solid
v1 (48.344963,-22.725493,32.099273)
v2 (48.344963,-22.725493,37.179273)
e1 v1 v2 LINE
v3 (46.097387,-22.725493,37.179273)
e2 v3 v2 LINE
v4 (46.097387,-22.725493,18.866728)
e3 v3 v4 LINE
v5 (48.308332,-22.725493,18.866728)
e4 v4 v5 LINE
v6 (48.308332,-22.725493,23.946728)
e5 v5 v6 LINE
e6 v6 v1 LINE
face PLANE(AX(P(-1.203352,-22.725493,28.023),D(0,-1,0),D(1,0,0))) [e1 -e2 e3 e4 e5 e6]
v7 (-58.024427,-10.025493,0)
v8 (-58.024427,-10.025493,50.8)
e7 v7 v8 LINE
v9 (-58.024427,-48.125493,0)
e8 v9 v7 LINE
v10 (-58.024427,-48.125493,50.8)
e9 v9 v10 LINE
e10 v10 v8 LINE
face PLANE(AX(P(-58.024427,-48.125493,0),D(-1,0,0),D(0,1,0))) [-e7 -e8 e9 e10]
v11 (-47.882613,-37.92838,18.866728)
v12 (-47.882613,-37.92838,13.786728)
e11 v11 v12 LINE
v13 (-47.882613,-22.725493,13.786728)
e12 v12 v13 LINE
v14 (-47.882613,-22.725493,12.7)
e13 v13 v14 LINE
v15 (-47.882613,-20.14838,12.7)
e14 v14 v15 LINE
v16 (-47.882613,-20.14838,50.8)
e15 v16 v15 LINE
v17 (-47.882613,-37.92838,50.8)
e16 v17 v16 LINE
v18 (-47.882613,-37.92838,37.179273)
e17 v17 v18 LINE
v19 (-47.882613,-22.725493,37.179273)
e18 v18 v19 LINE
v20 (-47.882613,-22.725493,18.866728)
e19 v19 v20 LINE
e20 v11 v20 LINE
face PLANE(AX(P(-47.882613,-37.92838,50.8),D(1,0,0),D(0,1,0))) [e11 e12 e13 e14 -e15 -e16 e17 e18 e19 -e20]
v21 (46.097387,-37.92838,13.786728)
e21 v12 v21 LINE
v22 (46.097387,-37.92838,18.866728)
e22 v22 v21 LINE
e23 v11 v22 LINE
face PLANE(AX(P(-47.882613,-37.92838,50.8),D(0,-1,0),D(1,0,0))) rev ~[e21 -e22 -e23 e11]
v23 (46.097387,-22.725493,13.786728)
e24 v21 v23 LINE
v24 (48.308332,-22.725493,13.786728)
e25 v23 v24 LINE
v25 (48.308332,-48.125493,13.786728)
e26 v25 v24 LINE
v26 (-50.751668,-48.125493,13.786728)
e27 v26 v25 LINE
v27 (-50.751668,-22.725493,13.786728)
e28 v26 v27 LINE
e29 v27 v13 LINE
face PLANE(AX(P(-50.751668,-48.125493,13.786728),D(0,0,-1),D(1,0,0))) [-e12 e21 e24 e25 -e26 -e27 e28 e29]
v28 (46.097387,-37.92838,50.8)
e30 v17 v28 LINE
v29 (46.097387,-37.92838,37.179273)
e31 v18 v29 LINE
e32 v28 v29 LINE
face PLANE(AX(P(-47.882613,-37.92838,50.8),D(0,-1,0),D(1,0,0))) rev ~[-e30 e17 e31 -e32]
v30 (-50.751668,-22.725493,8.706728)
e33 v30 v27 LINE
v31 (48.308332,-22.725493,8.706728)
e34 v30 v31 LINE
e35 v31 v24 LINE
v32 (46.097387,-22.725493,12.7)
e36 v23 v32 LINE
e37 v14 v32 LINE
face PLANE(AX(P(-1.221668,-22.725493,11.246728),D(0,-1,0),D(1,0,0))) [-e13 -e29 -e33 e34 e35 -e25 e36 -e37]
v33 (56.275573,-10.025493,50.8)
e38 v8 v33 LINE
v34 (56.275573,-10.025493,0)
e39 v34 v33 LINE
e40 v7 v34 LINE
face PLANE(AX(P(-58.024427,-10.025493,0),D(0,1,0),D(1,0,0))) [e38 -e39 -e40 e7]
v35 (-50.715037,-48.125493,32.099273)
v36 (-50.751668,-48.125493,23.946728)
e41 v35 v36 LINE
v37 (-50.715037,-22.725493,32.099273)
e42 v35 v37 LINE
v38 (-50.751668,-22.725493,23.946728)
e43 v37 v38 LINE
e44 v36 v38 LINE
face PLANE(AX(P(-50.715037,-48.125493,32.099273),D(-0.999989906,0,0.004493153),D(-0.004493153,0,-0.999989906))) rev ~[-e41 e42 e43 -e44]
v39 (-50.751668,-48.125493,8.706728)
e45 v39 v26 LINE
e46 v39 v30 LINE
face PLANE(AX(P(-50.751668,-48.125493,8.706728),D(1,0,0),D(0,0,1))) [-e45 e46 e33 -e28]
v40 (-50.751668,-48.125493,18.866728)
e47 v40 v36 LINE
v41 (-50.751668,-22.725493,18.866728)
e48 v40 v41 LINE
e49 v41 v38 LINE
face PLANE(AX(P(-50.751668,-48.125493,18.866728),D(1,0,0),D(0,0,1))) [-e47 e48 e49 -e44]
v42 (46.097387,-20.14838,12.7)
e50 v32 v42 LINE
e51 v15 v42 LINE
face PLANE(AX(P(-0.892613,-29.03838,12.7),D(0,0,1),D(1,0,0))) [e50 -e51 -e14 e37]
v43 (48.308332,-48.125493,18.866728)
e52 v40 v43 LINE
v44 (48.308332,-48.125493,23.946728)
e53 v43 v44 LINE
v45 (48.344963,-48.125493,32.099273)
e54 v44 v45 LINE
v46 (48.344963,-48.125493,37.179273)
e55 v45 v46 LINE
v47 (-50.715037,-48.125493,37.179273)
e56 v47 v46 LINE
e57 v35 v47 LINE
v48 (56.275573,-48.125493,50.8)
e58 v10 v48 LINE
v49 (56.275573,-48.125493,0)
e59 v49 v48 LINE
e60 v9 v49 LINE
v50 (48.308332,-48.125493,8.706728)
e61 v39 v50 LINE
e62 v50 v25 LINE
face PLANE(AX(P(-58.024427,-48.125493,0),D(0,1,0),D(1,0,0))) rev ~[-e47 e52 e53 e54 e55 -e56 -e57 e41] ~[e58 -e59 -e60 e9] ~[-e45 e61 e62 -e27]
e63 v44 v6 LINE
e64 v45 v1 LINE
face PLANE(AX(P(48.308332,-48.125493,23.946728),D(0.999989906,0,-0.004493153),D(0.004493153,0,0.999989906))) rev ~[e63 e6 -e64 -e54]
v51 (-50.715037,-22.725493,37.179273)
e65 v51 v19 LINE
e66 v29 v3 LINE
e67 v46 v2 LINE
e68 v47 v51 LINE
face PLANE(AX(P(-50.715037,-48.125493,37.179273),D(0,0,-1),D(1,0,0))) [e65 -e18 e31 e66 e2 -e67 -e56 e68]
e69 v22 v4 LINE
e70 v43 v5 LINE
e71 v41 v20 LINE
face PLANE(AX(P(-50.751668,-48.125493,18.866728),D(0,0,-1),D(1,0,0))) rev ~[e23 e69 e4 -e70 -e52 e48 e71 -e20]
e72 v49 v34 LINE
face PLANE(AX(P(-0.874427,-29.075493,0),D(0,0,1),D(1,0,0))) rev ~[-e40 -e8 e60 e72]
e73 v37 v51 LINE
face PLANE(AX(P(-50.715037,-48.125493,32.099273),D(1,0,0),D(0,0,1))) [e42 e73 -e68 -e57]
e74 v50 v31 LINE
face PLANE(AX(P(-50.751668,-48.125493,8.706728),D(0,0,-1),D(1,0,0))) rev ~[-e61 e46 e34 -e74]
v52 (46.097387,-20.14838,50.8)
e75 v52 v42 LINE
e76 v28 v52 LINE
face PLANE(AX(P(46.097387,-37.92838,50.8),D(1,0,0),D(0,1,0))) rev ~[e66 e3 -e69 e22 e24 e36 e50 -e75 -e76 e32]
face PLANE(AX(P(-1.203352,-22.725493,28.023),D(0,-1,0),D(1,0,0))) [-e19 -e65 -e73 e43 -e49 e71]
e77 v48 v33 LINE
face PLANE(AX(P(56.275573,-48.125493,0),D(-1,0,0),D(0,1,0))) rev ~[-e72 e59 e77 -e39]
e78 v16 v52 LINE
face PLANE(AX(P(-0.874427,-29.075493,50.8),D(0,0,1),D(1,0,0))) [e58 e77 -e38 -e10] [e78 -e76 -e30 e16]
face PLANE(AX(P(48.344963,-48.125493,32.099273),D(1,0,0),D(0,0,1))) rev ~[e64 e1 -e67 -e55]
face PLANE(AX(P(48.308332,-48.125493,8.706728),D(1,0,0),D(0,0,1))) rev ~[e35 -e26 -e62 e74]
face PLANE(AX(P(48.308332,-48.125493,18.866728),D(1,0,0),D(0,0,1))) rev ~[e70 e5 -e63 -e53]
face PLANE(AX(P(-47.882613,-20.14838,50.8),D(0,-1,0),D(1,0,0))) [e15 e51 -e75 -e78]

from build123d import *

# Parameters (mm, degrees)
F0_W     = 114.3
F0_H     = 38.1
F1_DEPTH = 50.8
F2_W     = 93.98
F2_H     = 17.78
F3_DEPTH = 38.1
F4_W     = 99.06
F4_H     = 5.08
F5_DEPTH = 25.4
F6_DEPTH = 25.4


# Not quite as in the source:
# - a feature names something its author has since deleted; it is built from what else it names


with BuildPart() as f1:
    # F0 (on Top) → F1 (new body)
    with BuildSketch(Plane.XY):
        with Locations((-0.8744271472, -29.0754930802)):
            Rectangle(F0_W, F0_H)
    extrude(amount=F1_DEPTH)

    # F2 (on face) → F3 (cut)
    with BuildSketch(Plane.XY.offset(50.8)):
        with Locations((-0.8926133716, -29.0383800721)):
            Rectangle(F2_W, F2_H)
    extrude(amount=-F3_DEPTH, mode=Mode.SUBTRACT)

    # F4 (on face) → F5 (cut)
    with BuildSketch(Plane.XZ.offset(48.1254930802)):
        with Locations((-1.2216676867, 11.2467280274)):
            Rectangle(F4_W, F4_H)
        Polygon((-50.7150366902, 32.0992726219), (-50.7516676867, 23.9467280274), (48.3083323133, 23.9467280274), (48.3449633098, 32.0992726219), align=None)
        with Locations((-1.2216676867, 21.4067280274)):
            Rectangle(F4_W, F4_H)
        with Locations((-1.1850366902, 34.6392726219)):
            Rectangle(F4_W, F4_H)
    extrude(amount=-F5_DEPTH, mode=Mode.SUBTRACT)

    # F4 (on face) → F6 (cut)
    with BuildSketch(Plane.XZ.offset(48.1254930802)):
        with Locations((-1.2216676867, 11.2467280274)):
            Rectangle(F4_W, F4_H)
        Polygon((-50.7150366902, 32.0992726219), (-50.7516676867, 23.9467280274), (48.3083323133, 23.9467280274), (48.3449633098, 32.0992726219), align=None)
        with Locations((-1.2216676867, 21.4067280274)):
            Rectangle(F4_W, F4_H)
        with Locations((-1.1850366902, 34.6392726219)):
            Rectangle(F4_W, F4_H)
    extrude(amount=-F6_DEPTH, mode=Mode.SUBTRACT)


solid = f1.part
